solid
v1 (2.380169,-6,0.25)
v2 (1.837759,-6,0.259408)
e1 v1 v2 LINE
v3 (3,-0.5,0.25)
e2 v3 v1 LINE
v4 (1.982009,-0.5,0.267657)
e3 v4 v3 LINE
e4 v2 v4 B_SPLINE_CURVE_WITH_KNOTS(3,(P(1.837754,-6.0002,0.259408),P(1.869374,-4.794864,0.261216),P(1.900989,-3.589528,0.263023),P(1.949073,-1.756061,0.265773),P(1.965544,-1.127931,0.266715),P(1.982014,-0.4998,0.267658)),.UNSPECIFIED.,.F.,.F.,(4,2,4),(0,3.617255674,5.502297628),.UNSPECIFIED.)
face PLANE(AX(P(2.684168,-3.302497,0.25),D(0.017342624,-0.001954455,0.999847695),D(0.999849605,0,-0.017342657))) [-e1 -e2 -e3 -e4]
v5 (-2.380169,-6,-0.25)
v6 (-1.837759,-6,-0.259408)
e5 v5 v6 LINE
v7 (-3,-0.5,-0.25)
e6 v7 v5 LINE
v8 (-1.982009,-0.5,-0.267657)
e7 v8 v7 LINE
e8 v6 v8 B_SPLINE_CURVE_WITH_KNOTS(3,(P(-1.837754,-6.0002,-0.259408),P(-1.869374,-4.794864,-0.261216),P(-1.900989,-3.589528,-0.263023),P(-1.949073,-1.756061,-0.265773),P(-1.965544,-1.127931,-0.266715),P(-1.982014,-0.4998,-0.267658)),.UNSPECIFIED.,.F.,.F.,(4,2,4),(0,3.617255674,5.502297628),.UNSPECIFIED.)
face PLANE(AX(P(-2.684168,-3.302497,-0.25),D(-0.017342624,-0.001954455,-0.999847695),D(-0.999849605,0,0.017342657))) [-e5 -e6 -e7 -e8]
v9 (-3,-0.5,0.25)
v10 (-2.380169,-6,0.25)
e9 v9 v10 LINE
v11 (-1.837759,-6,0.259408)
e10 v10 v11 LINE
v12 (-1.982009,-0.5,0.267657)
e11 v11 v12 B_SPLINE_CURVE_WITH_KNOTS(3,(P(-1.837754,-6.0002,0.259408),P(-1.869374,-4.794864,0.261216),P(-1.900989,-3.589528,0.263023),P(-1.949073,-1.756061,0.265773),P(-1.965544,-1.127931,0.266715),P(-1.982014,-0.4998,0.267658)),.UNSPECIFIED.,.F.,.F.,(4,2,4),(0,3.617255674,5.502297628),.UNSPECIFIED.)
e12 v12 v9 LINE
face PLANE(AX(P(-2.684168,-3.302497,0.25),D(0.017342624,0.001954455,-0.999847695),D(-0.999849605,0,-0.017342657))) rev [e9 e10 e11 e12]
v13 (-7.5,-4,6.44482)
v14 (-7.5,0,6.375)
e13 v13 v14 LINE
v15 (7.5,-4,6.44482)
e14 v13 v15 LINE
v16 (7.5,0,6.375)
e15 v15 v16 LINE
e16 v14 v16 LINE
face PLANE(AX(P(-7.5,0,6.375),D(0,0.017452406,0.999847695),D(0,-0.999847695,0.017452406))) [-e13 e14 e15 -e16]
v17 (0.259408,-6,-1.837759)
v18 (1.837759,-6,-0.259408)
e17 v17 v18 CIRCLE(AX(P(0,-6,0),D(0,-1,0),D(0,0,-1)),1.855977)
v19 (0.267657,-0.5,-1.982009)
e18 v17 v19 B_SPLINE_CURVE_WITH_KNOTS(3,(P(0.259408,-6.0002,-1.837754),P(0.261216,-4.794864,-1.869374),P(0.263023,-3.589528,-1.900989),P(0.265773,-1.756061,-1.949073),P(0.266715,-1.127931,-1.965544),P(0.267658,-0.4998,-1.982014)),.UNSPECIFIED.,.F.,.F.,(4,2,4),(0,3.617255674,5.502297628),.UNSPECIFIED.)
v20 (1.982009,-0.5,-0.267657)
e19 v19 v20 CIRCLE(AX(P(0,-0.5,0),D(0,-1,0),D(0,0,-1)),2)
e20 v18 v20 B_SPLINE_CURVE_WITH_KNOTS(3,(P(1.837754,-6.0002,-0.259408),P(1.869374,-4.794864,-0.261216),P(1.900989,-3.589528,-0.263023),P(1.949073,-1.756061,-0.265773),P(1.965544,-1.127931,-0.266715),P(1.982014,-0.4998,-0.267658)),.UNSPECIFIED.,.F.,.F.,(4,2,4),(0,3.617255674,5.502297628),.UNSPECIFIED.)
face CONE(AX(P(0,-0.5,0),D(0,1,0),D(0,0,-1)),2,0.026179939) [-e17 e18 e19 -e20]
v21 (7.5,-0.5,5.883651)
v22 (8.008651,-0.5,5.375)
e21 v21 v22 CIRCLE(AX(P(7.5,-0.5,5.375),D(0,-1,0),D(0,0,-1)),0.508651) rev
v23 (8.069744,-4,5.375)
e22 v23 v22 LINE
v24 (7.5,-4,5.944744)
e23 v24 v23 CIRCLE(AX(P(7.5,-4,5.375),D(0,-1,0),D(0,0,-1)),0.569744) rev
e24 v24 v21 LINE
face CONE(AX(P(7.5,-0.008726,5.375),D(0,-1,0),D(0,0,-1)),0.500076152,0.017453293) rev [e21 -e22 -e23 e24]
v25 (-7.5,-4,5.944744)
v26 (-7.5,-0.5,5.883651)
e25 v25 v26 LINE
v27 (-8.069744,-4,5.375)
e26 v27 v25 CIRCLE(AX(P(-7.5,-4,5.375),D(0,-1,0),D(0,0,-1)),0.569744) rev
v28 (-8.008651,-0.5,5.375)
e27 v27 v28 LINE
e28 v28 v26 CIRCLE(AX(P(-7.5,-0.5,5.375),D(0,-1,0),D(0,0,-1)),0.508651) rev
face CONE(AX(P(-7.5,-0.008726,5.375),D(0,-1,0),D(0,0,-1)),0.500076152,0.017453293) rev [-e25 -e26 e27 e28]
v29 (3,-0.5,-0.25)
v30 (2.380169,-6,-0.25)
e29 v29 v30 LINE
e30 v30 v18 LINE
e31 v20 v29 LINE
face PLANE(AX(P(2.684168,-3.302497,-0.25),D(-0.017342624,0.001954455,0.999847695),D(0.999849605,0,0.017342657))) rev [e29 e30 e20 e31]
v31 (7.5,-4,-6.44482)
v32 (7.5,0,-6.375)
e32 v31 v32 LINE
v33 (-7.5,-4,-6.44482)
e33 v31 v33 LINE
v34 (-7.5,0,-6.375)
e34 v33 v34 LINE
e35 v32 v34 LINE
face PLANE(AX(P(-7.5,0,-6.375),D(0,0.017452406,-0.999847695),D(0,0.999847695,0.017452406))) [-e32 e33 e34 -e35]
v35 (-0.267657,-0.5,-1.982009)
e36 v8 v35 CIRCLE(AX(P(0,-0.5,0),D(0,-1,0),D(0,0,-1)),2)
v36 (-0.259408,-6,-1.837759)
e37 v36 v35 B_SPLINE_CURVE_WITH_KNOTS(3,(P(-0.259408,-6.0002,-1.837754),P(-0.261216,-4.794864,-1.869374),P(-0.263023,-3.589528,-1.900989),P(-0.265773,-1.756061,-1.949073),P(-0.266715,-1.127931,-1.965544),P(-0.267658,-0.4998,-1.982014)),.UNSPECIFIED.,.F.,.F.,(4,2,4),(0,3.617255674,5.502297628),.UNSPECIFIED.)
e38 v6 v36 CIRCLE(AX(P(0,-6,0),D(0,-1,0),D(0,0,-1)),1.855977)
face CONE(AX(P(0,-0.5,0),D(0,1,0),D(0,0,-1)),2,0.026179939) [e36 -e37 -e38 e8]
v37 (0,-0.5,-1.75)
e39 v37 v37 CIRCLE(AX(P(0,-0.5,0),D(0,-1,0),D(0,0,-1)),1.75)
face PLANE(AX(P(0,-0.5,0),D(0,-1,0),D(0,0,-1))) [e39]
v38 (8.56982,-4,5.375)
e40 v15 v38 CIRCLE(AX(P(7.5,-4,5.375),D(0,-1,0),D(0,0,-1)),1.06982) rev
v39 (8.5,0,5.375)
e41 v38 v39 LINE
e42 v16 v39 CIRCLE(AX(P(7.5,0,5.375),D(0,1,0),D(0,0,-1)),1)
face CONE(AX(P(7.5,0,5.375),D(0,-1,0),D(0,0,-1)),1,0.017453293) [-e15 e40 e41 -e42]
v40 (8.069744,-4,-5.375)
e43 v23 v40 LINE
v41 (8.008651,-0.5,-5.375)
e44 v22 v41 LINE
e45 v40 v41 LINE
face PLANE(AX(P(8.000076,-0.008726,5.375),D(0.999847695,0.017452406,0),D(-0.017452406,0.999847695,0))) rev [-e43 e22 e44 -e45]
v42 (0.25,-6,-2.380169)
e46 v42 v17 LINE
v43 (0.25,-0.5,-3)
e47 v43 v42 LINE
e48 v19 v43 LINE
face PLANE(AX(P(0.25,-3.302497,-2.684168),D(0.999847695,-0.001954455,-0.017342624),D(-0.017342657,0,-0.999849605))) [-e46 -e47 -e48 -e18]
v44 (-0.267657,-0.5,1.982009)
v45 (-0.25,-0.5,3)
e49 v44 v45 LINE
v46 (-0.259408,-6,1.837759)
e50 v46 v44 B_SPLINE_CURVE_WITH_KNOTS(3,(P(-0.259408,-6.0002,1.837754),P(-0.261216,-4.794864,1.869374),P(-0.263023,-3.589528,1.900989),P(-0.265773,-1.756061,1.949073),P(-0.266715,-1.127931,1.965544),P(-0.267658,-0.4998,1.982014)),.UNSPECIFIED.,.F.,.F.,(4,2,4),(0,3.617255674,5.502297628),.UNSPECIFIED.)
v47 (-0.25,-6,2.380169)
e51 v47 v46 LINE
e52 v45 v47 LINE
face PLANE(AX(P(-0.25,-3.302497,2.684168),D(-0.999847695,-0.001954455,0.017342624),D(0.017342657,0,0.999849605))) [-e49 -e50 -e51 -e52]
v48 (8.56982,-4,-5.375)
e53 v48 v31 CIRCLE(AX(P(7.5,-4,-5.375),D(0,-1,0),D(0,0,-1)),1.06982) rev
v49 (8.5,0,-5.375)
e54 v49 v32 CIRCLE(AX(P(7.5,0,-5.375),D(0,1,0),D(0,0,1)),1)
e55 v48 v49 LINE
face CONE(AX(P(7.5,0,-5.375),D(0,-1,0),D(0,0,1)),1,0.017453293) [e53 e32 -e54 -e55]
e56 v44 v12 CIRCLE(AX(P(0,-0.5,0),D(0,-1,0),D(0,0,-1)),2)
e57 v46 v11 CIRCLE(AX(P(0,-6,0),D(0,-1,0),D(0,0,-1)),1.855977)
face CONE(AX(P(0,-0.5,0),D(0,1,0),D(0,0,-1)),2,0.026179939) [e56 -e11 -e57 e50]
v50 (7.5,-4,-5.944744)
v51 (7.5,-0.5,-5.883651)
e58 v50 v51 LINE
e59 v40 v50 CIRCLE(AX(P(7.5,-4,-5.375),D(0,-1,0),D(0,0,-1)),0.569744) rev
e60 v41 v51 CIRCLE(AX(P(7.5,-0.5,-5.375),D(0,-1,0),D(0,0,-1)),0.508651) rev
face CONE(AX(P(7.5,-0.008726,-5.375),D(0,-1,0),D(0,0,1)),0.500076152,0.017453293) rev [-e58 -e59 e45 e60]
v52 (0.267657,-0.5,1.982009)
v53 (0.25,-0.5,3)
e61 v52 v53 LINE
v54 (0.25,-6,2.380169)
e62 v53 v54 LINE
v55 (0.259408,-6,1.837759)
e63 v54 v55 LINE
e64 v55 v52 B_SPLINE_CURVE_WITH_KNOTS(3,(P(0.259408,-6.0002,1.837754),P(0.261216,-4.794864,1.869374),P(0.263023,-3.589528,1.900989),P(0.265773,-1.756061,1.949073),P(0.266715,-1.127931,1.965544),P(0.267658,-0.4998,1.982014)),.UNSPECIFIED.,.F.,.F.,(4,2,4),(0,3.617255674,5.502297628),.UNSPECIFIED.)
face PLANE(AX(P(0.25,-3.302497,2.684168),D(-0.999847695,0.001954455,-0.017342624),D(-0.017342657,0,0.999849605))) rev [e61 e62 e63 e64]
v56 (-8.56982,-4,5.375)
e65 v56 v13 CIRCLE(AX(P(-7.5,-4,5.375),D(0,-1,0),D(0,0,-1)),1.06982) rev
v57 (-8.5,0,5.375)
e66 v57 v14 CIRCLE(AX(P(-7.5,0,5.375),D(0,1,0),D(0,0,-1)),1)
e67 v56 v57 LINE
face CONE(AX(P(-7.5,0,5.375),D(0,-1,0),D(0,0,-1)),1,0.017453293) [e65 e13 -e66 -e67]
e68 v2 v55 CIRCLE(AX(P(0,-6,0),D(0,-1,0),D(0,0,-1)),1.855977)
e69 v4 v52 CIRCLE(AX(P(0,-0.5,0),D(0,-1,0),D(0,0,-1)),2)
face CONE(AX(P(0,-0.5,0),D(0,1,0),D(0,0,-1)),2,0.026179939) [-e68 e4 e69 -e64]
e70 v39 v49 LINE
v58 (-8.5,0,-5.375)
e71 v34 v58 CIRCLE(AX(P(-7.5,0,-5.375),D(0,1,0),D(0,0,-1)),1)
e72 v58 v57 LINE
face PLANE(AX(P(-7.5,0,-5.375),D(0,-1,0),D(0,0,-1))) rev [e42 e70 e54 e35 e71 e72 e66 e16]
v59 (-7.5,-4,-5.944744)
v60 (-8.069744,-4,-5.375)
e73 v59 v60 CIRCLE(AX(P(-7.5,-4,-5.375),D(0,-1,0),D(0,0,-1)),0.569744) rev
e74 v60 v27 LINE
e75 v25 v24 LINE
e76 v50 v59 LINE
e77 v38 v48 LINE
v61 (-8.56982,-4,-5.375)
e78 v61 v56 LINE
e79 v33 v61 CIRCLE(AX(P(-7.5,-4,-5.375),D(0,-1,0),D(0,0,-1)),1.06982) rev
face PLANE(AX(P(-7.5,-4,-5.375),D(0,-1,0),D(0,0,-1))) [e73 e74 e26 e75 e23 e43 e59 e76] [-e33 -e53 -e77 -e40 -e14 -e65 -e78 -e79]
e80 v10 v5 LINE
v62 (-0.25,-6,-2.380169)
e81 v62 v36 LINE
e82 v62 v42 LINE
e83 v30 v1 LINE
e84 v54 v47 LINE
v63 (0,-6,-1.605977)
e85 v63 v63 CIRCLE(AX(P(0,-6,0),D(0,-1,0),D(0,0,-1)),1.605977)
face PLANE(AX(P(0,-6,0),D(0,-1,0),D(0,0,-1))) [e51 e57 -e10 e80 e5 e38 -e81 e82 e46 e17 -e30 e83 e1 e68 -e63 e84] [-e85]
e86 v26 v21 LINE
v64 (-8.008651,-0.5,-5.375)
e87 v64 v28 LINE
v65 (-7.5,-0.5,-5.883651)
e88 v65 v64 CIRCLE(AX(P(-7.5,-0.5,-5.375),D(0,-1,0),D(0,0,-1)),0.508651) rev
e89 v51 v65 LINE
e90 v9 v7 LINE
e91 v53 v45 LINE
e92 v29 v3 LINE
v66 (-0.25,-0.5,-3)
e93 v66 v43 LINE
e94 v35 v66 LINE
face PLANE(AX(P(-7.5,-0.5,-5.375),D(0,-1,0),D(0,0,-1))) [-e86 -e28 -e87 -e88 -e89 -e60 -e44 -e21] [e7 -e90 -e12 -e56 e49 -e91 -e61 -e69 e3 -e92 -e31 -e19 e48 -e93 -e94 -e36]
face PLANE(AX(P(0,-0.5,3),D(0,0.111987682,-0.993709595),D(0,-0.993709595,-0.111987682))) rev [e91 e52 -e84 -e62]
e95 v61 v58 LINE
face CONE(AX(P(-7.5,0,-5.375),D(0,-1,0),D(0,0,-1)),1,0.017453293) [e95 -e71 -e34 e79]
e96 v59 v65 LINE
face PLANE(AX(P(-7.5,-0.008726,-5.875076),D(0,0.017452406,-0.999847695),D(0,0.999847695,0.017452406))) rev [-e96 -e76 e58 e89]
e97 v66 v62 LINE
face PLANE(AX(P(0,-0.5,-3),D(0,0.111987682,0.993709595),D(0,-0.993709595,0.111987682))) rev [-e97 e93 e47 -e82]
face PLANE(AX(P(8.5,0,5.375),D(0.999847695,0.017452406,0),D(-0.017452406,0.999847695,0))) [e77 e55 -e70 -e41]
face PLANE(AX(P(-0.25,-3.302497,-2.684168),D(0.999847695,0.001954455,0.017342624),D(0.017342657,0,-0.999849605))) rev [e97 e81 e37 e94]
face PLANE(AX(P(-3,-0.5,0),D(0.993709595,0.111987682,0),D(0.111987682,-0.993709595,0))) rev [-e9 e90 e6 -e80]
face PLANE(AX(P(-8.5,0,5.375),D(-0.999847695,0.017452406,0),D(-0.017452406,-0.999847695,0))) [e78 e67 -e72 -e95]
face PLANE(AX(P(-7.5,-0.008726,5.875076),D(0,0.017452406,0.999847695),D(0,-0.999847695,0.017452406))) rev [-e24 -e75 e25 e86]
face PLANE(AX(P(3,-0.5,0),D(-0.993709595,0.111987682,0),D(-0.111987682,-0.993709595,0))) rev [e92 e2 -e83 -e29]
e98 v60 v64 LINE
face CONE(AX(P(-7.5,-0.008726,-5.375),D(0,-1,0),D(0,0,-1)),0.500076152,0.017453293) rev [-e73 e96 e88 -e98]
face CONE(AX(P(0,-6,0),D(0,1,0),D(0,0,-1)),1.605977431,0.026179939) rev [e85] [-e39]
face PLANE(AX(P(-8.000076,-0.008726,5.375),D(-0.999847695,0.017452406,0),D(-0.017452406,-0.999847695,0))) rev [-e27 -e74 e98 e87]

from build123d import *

# Parameters (mm, degrees)
BOSS_EXTRUDE1_DEPTH = 4
BOSS_EXTRUDE1_DRAFT = 1
SHELL1_T            = -0.5
SKETCH2_R           = 2
BOSS_EXTRUDE2_DEPTH = 5.5
BOSS_EXTRUDE2_TAPER = 1.5
CIRPATTERN1_COUNT   = 4
SKETCH4_R           = 1.605977431
CUT_EXTRUDE1_DEPTH  = 5.5
CUT_EXTRUDE1_DRAFT  = 1.5


with BuildPart() as part:
    # Sketch1 → Boss-Extrude1 (with draft: the straight prism first)
    with BuildSketch(Plane(origin=(0, 0, 0), x_dir=(1, 0, 0), z_dir=(0, 1, 0))):
        with BuildLine():
            Line((-7.5, -6.375), (7.5, -6.375))
            ThreePointArc((7.5, -6.375), (8.207106781, -6.082106781), (8.5, -5.375))
            Line((8.5, -5.375), (8.5, 5.375))
            ThreePointArc((8.5, 5.375), (8.207106781, 6.082106781), (7.5, 6.375))
            Line((7.5, 6.375), (-7.5, 6.375))
            ThreePointArc((-7.5, 6.375), (-8.207106781, 6.082106781), (-8.5, 5.375))
            Line((-8.5, 5.375), (-8.5, -5.375))
            ThreePointArc((-8.5, -5.375), (-8.207106781, -6.082106781), (-7.5, -6.375))
        make_face()
    extrude(amount=-BOSS_EXTRUDE1_DEPTH)
    # Boss-Extrude1: the draft: its side faces are tilted about the plane it starts from
    boss_extrude1_sides = [part.faces().sort_by_distance(p)[0] for p in [
        (0, -2, 6.375),
        (8.207106781, -2, 6.082106781),
        (8.5, -2, 0),
        (8.207106781, -2, -6.082106781),
        (0, -2, -6.375),
        (-8.207106781, -2, -6.082106781),
        (-8.5, -2, 0),
        (-8.207106781, -2, 6.082106781),
    ]]
    draft(boss_extrude1_sides, Plane(origin=(0, 0, 0), x_dir=(1, 0, 0), z_dir=(0, 1, 0)), BOSS_EXTRUDE1_DRAFT)

    # Shell1
    shell1_openings = [part.faces().sort_by_distance(p)[0] for p in [
        (0, -4, 0),
    ]]
    offset(amount=SHELL1_T, openings=shell1_openings, kind=Kind.INTERSECTION)

    # Sketch2 → Boss-Extrude2 (add)
    with BuildSketch(Plane.XZ.offset(0.5)):
        Circle(SKETCH2_R)
    extrude(amount=BOSS_EXTRUDE2_DEPTH, taper=BOSS_EXTRUDE2_TAPER)

    # Rib1: read off the stored shape, not the designer's step
    # Rib1: loft between two sections, ruled curve by curve
    rib1_from = [
        Edge.make_line((1.98200897, -0.5, 0.267657325), (3, -0.5, 0.25)),
        Edge.make_line((1.98200897, -0.5, -0.267657325), (3, -0.5, -0.25)),
        Edge.make_line((3, -0.5, -0.25), (3, -0.5, 0.25)),
        Edge.make_line((1.98200897, -0.5, -0.267657325), (1.98200897, -0.5, 0.267657325)),
    ]
    rib1_to = [
        Edge.make_line((1.837759395, -6, 0.259408234), (2.380168761, -6, 0.25)),
        Edge.make_line((1.837759395, -6, -0.259408234), (2.380168761, -6, -0.25)),
        Edge.make_line((2.380168761, -6, -0.25), (2.380168761, -6, 0.25)),
        Edge.make_line((1.837759395, -6, -0.259408234), (1.837759395, -6, 0.259408234)),
    ]
    rib1 = Solid(Shell([*[Face.make_surface_from_curves(rib1_from[k], rib1_to[k]) for k in range(4)], Face(Wire(rib1_from)), Face(Wire(rib1_to))]))
    add(rib1)

    # CirPattern1: Rib1 ×4 about axis
    cirpattern1_axis = Axis((0, 0, 0), (0, 1, 0))
    for i in range(1, CIRPATTERN1_COUNT):
        add(rib1.rotate(cirpattern1_axis, i * 360 / CIRPATTERN1_COUNT))


with BuildPart() as cut_extrude1_tool:
    # Sketch4 → Cut-Extrude1 (with draft: the straight prism first)
    with BuildSketch(Plane.XZ.offset(6)):
        Circle(SKETCH4_R)
    extrude(amount=-CUT_EXTRUDE1_DEPTH)
    # Cut-Extrude1: the draft: its side faces are tilted about the plane it starts from
    cut_extrude1_sides = [cut_extrude1_tool.faces().sort_by_distance(p)[0] for p in [
        (-1.605977431, -3.25, 0),
    ]]
    draft(cut_extrude1_sides, Plane.XZ.offset(6), CUT_EXTRUDE1_DRAFT)


with BuildPart() as part_1:
    add(part.part)

    # Cut-Extrude1: cut by cut_extrude1_tool
    add(cut_extrude1_tool.part, mode=Mode.SUBTRACT)


solid = part_1.part
